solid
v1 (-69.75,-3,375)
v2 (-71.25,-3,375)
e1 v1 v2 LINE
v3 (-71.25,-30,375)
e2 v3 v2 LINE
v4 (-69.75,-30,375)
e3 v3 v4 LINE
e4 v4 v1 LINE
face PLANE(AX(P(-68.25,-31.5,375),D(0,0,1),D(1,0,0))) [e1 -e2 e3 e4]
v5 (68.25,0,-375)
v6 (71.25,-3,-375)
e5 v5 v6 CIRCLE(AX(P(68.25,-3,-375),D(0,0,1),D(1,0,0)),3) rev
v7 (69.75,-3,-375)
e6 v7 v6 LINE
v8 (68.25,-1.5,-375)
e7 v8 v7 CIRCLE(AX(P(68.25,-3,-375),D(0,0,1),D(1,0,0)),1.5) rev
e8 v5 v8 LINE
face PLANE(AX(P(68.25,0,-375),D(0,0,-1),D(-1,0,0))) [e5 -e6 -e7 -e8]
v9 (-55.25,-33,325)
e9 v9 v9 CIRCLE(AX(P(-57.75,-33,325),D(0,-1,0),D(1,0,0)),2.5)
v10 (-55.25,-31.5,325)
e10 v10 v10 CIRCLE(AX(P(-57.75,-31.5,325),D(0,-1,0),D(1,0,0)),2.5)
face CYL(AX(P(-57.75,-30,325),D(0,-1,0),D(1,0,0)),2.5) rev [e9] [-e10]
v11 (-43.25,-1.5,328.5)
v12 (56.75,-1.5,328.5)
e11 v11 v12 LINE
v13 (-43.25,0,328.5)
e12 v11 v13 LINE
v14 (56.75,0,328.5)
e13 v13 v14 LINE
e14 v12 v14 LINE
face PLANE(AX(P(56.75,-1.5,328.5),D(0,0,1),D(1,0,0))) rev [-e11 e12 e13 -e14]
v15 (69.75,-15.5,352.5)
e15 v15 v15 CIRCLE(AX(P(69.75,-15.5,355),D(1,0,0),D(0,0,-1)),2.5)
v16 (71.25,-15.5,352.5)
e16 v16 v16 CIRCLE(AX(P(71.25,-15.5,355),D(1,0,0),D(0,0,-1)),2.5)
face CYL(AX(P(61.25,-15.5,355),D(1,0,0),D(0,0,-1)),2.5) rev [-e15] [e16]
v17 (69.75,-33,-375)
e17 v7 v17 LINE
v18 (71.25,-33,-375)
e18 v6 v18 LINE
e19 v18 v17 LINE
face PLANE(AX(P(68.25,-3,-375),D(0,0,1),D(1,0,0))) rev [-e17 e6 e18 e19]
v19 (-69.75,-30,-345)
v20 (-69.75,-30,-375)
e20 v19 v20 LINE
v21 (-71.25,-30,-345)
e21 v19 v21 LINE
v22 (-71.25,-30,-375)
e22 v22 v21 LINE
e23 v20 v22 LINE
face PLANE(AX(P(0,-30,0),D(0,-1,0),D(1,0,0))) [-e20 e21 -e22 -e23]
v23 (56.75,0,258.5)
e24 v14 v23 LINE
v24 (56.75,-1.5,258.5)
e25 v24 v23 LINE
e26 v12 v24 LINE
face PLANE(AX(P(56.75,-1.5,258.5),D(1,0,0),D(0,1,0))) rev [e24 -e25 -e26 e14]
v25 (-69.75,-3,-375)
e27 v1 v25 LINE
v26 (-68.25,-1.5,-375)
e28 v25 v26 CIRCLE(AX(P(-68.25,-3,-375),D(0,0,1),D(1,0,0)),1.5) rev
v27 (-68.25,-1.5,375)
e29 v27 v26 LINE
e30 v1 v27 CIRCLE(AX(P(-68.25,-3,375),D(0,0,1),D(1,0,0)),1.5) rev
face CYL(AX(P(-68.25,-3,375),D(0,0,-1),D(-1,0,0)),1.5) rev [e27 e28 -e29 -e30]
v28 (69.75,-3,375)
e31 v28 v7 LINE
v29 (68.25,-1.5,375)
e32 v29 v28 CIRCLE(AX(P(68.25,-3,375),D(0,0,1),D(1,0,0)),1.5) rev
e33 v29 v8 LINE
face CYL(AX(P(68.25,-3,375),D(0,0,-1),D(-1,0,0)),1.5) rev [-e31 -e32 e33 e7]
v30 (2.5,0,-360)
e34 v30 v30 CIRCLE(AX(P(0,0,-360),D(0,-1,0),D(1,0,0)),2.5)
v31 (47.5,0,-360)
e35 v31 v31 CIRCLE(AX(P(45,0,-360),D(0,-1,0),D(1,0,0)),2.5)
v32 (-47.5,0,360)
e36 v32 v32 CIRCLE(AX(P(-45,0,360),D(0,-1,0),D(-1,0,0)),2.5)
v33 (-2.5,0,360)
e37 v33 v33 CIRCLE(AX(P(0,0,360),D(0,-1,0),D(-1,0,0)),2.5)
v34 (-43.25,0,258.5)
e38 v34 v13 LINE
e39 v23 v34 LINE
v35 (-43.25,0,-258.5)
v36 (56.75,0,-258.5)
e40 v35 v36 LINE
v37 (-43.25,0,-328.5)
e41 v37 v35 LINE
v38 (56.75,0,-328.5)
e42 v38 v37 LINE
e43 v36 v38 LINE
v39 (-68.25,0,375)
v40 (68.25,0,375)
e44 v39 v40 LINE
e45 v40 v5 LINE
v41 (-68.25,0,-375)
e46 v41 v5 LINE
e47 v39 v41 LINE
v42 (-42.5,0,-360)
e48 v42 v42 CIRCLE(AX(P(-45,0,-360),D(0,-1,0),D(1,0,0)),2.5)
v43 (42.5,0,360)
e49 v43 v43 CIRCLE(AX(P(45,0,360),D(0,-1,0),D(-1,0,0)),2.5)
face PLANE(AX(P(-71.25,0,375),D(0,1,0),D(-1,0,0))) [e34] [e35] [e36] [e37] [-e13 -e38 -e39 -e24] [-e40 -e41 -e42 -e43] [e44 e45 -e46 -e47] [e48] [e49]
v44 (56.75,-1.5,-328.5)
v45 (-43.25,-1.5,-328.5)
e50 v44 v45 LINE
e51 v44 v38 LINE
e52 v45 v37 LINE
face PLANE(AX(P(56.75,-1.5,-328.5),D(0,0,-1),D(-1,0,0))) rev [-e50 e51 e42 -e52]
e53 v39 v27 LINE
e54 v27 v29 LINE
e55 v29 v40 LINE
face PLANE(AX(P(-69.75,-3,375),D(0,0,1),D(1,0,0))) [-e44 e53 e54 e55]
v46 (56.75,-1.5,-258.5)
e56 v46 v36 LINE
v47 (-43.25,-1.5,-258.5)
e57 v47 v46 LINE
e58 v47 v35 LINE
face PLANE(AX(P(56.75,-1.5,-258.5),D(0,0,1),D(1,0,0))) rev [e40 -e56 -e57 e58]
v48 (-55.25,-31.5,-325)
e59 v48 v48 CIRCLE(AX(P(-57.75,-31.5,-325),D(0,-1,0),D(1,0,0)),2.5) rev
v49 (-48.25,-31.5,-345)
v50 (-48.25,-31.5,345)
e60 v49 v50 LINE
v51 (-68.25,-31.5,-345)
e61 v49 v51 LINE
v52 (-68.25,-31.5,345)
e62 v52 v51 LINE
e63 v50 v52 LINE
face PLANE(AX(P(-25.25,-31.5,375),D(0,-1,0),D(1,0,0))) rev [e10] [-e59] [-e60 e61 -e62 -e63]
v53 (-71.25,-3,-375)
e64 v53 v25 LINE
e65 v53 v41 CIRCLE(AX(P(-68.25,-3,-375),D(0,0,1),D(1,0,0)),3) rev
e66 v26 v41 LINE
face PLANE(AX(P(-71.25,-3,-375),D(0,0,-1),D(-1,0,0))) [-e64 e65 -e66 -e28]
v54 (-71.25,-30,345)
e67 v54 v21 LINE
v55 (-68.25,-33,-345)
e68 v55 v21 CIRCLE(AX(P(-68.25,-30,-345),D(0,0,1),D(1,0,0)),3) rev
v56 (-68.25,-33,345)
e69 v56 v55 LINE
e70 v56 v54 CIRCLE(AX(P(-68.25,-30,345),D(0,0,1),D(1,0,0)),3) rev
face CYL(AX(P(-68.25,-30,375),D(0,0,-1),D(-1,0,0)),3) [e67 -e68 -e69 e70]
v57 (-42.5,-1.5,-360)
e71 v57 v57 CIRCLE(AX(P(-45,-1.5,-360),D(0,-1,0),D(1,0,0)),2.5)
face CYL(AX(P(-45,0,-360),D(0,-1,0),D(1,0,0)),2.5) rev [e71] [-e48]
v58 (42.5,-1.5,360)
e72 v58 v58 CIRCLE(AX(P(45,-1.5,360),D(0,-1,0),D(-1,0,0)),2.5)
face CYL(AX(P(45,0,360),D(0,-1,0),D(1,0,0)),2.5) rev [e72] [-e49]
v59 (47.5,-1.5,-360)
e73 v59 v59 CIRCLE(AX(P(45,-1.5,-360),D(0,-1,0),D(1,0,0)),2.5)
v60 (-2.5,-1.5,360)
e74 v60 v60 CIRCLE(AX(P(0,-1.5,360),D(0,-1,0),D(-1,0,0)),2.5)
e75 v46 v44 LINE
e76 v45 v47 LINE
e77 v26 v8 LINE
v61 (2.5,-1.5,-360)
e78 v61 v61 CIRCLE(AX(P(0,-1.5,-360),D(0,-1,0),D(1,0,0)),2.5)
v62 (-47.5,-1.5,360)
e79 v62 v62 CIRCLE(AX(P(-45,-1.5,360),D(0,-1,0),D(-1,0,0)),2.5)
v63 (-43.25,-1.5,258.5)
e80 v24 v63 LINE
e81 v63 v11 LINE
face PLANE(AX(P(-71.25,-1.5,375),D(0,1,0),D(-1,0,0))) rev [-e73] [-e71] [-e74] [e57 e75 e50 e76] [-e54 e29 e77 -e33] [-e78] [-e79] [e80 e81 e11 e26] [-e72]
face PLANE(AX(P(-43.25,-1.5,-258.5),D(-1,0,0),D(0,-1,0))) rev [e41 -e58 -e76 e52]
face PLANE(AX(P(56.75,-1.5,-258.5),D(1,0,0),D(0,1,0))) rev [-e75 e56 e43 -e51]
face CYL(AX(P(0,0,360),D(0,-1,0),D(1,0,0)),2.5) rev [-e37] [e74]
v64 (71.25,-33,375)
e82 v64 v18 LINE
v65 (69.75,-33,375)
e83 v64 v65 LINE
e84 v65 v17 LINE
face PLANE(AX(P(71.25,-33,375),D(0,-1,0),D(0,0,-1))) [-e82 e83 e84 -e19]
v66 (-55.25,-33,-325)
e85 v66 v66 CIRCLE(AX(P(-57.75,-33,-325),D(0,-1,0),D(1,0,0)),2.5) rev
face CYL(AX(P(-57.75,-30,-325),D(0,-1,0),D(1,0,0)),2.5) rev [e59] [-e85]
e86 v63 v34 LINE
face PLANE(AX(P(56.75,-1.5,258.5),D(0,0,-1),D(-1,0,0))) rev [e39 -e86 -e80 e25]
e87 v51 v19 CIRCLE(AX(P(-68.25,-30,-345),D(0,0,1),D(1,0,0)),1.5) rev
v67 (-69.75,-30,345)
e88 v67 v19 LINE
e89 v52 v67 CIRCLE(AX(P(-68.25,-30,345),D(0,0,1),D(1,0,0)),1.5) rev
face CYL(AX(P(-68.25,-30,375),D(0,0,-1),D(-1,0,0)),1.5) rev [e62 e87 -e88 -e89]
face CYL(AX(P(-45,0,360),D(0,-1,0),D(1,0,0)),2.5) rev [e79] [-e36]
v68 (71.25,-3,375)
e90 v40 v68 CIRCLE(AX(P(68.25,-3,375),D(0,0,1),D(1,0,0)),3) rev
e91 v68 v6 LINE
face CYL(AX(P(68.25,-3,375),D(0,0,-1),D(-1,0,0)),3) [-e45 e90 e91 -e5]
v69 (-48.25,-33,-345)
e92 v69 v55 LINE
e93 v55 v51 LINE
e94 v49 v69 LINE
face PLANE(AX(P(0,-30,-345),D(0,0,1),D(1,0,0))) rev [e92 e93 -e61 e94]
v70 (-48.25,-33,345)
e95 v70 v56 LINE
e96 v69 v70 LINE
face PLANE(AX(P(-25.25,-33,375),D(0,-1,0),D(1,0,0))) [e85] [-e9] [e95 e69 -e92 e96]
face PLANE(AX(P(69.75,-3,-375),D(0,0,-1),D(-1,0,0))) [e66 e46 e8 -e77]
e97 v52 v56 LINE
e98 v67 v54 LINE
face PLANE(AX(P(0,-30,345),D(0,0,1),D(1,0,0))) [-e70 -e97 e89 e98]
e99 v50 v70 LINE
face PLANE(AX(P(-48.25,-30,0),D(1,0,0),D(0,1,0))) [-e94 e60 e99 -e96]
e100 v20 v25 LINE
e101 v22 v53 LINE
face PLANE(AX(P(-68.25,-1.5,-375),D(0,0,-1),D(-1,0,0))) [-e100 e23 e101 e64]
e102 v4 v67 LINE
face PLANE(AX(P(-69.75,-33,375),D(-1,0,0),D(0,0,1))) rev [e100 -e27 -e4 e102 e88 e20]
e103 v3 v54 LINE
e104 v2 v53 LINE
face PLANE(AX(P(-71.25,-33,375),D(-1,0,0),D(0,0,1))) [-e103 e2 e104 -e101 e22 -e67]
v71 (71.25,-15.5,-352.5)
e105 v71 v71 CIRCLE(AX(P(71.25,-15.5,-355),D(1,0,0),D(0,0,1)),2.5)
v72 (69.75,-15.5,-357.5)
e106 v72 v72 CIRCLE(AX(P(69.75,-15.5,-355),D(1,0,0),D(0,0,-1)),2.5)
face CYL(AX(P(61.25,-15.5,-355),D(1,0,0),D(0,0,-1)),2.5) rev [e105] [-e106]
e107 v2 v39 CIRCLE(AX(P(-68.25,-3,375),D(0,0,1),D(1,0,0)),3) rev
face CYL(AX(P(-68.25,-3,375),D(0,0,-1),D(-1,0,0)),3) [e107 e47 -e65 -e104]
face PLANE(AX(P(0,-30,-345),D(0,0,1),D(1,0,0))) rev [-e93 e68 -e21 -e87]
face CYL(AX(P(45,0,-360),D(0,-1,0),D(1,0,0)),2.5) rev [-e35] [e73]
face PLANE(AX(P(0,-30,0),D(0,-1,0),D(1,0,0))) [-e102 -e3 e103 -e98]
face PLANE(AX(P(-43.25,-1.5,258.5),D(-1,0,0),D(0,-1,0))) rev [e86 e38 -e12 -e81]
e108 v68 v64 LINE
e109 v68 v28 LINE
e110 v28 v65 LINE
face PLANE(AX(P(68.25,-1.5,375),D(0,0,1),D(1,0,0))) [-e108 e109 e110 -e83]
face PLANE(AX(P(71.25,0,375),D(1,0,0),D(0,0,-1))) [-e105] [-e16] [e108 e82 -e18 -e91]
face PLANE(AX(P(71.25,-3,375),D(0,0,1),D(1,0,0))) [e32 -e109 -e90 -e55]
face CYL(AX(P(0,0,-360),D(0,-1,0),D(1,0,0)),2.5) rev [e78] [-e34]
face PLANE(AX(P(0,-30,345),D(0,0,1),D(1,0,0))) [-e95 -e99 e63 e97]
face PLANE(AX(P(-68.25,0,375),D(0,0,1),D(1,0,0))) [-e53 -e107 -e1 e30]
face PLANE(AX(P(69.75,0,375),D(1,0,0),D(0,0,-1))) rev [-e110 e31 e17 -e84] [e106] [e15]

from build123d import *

# Parameters (mm, degrees)
SM_BASE_FLANGE_1_DEPTH = 375
SKETCH_6_R             = 2.5
CUT_EXTRUDE_1_DEPTH    = 10
SKETCH_7_R             = 2.5
SKETCH_7_W             = 20
SKETCH_7_H             = 30
SKETCH_7_W_2           = 3
CUT_EXTRUDE_2_DEPTH    = 3
SKETCH_8_R             = 2.5
CUT_EXTRUDE_3_DEPTH    = 1.5
SKETCH_10_W            = 100
SKETCH_10_H            = 70
CUT_EXTRUDE_5_DEPTH    = 1.5


# Sheet-metal steps are written as plain solids
with BuildPart() as part:
    # Sketch 1 → Базовая кромка1 (new, symmetric)
    with BuildSketch(Plane.XY):
        with BuildLine():
            Line((-25.25, -33), (-68.25, -33))
            ThreePointArc((-68.25, -33), (-70.371320344, -32.121320344), (-71.25, -30))
            Line((-71.25, -30), (-71.25, -3))
            ThreePointArc((-71.25, -3), (-70.371320344, -0.878679656), (-68.25, 0))
            Line((-68.25, 0), (68.25, 0))
            ThreePointArc((68.25, 0), (70.371320344, -0.878679656), (71.25, -3))
            Line((71.25, -3), (71.25, -33))
            Line((71.25, -33), (69.75, -33))
            Line((69.75, -33), (69.75, -3))
            ThreePointArc((69.75, -3), (69.310660172, -1.939339828), (68.25, -1.5))
            Line((68.25, -1.5), (-68.25, -1.5))
            ThreePointArc((-68.25, -1.5), (-69.310660172, -1.939339828), (-69.75, -3))
            Line((-69.75, -3), (-69.75, -30))
            ThreePointArc((-69.75, -30), (-69.310660172, -31.060660172), (-68.25, -31.5))
            Line((-68.25, -31.5), (-25.25, -31.5))
            Line((-25.25, -31.5), (-25.25, -33))
        make_face()
    extrude(amount=SM_BASE_FLANGE_1_DEPTH, both=True)

    # Эскиз6 → Вырез-Вытянуть1 (cut)
    with BuildSketch(Plane(origin=(71.25, 0, 0), x_dir=(0, 0, -1), z_dir=(1, 0, 0))):
        with Locations((-355, -15.5)):
            Circle(SKETCH_6_R)
        with Locations((355, -15.5)):
            Circle(SKETCH_6_R)
    extrude(amount=-CUT_EXTRUDE_1_DEPTH, mode=Mode.SUBTRACT)

    # Эскиз7 → Вырез-Вытянуть2 (cut)
    with BuildSketch(Plane.XZ.offset(33)):
        with Locations((-57.75, -325)):
            Circle(SKETCH_7_R)
        with Locations((-58.25, -360)):
            Rectangle(SKETCH_7_W, SKETCH_7_H)
        Polygon((-48.25, -375), (-25.25, -375), (-25.25, 375), (-48.25, 375), (-48.25, 345), (-48.25, -345), align=None)
        with Locations((-69.75, -360)):
            Rectangle(SKETCH_7_W_2, SKETCH_7_H)
        with Locations((-58.25, 360)):
            Rectangle(SKETCH_7_W, SKETCH_7_H)
        with Locations((-69.75, 360)):
            Rectangle(SKETCH_7_W_2, SKETCH_7_H)
        with Locations((-57.75, 325)):
            Circle(SKETCH_7_R)
    extrude(amount=-CUT_EXTRUDE_2_DEPTH, mode=Mode.SUBTRACT)

    # Эскиз8 → Вырез-Вытянуть3 (cut)
    with BuildSketch(Plane.XZ.offset(1.5)):
        with Locations((-45, -360)):
            Circle(SKETCH_8_R)
        with Locations((0, -360)):
            Circle(SKETCH_8_R)
        with Locations((45, -360)):
            Circle(SKETCH_8_R)
        with Locations(Location((45, 360, 0), (0, 0, 180))):
            Circle(SKETCH_8_R)
        with Locations(Location((0, 360, 0), (0, 0, 180))):
            Circle(SKETCH_8_R)
        with Locations(Location((-45, 360, 0), (0, 0, 180))):
            Circle(SKETCH_8_R)
    extrude(amount=-CUT_EXTRUDE_3_DEPTH, mode=Mode.SUBTRACT)

    # Эскиз10 → Вырез-Вытянуть5 (cut)
    with BuildSketch(Plane(origin=(0, 0, 0), x_dir=(1, 0, 0), z_dir=(0, 1, 0))):
        with Locations((6.75, 293.5)):
            Rectangle(SKETCH_10_W, SKETCH_10_H)
        with Locations((6.75, -293.5)):
            Rectangle(SKETCH_10_W, SKETCH_10_H)
    extrude(amount=-CUT_EXTRUDE_5_DEPTH, mode=Mode.SUBTRACT)


solid = part.part
